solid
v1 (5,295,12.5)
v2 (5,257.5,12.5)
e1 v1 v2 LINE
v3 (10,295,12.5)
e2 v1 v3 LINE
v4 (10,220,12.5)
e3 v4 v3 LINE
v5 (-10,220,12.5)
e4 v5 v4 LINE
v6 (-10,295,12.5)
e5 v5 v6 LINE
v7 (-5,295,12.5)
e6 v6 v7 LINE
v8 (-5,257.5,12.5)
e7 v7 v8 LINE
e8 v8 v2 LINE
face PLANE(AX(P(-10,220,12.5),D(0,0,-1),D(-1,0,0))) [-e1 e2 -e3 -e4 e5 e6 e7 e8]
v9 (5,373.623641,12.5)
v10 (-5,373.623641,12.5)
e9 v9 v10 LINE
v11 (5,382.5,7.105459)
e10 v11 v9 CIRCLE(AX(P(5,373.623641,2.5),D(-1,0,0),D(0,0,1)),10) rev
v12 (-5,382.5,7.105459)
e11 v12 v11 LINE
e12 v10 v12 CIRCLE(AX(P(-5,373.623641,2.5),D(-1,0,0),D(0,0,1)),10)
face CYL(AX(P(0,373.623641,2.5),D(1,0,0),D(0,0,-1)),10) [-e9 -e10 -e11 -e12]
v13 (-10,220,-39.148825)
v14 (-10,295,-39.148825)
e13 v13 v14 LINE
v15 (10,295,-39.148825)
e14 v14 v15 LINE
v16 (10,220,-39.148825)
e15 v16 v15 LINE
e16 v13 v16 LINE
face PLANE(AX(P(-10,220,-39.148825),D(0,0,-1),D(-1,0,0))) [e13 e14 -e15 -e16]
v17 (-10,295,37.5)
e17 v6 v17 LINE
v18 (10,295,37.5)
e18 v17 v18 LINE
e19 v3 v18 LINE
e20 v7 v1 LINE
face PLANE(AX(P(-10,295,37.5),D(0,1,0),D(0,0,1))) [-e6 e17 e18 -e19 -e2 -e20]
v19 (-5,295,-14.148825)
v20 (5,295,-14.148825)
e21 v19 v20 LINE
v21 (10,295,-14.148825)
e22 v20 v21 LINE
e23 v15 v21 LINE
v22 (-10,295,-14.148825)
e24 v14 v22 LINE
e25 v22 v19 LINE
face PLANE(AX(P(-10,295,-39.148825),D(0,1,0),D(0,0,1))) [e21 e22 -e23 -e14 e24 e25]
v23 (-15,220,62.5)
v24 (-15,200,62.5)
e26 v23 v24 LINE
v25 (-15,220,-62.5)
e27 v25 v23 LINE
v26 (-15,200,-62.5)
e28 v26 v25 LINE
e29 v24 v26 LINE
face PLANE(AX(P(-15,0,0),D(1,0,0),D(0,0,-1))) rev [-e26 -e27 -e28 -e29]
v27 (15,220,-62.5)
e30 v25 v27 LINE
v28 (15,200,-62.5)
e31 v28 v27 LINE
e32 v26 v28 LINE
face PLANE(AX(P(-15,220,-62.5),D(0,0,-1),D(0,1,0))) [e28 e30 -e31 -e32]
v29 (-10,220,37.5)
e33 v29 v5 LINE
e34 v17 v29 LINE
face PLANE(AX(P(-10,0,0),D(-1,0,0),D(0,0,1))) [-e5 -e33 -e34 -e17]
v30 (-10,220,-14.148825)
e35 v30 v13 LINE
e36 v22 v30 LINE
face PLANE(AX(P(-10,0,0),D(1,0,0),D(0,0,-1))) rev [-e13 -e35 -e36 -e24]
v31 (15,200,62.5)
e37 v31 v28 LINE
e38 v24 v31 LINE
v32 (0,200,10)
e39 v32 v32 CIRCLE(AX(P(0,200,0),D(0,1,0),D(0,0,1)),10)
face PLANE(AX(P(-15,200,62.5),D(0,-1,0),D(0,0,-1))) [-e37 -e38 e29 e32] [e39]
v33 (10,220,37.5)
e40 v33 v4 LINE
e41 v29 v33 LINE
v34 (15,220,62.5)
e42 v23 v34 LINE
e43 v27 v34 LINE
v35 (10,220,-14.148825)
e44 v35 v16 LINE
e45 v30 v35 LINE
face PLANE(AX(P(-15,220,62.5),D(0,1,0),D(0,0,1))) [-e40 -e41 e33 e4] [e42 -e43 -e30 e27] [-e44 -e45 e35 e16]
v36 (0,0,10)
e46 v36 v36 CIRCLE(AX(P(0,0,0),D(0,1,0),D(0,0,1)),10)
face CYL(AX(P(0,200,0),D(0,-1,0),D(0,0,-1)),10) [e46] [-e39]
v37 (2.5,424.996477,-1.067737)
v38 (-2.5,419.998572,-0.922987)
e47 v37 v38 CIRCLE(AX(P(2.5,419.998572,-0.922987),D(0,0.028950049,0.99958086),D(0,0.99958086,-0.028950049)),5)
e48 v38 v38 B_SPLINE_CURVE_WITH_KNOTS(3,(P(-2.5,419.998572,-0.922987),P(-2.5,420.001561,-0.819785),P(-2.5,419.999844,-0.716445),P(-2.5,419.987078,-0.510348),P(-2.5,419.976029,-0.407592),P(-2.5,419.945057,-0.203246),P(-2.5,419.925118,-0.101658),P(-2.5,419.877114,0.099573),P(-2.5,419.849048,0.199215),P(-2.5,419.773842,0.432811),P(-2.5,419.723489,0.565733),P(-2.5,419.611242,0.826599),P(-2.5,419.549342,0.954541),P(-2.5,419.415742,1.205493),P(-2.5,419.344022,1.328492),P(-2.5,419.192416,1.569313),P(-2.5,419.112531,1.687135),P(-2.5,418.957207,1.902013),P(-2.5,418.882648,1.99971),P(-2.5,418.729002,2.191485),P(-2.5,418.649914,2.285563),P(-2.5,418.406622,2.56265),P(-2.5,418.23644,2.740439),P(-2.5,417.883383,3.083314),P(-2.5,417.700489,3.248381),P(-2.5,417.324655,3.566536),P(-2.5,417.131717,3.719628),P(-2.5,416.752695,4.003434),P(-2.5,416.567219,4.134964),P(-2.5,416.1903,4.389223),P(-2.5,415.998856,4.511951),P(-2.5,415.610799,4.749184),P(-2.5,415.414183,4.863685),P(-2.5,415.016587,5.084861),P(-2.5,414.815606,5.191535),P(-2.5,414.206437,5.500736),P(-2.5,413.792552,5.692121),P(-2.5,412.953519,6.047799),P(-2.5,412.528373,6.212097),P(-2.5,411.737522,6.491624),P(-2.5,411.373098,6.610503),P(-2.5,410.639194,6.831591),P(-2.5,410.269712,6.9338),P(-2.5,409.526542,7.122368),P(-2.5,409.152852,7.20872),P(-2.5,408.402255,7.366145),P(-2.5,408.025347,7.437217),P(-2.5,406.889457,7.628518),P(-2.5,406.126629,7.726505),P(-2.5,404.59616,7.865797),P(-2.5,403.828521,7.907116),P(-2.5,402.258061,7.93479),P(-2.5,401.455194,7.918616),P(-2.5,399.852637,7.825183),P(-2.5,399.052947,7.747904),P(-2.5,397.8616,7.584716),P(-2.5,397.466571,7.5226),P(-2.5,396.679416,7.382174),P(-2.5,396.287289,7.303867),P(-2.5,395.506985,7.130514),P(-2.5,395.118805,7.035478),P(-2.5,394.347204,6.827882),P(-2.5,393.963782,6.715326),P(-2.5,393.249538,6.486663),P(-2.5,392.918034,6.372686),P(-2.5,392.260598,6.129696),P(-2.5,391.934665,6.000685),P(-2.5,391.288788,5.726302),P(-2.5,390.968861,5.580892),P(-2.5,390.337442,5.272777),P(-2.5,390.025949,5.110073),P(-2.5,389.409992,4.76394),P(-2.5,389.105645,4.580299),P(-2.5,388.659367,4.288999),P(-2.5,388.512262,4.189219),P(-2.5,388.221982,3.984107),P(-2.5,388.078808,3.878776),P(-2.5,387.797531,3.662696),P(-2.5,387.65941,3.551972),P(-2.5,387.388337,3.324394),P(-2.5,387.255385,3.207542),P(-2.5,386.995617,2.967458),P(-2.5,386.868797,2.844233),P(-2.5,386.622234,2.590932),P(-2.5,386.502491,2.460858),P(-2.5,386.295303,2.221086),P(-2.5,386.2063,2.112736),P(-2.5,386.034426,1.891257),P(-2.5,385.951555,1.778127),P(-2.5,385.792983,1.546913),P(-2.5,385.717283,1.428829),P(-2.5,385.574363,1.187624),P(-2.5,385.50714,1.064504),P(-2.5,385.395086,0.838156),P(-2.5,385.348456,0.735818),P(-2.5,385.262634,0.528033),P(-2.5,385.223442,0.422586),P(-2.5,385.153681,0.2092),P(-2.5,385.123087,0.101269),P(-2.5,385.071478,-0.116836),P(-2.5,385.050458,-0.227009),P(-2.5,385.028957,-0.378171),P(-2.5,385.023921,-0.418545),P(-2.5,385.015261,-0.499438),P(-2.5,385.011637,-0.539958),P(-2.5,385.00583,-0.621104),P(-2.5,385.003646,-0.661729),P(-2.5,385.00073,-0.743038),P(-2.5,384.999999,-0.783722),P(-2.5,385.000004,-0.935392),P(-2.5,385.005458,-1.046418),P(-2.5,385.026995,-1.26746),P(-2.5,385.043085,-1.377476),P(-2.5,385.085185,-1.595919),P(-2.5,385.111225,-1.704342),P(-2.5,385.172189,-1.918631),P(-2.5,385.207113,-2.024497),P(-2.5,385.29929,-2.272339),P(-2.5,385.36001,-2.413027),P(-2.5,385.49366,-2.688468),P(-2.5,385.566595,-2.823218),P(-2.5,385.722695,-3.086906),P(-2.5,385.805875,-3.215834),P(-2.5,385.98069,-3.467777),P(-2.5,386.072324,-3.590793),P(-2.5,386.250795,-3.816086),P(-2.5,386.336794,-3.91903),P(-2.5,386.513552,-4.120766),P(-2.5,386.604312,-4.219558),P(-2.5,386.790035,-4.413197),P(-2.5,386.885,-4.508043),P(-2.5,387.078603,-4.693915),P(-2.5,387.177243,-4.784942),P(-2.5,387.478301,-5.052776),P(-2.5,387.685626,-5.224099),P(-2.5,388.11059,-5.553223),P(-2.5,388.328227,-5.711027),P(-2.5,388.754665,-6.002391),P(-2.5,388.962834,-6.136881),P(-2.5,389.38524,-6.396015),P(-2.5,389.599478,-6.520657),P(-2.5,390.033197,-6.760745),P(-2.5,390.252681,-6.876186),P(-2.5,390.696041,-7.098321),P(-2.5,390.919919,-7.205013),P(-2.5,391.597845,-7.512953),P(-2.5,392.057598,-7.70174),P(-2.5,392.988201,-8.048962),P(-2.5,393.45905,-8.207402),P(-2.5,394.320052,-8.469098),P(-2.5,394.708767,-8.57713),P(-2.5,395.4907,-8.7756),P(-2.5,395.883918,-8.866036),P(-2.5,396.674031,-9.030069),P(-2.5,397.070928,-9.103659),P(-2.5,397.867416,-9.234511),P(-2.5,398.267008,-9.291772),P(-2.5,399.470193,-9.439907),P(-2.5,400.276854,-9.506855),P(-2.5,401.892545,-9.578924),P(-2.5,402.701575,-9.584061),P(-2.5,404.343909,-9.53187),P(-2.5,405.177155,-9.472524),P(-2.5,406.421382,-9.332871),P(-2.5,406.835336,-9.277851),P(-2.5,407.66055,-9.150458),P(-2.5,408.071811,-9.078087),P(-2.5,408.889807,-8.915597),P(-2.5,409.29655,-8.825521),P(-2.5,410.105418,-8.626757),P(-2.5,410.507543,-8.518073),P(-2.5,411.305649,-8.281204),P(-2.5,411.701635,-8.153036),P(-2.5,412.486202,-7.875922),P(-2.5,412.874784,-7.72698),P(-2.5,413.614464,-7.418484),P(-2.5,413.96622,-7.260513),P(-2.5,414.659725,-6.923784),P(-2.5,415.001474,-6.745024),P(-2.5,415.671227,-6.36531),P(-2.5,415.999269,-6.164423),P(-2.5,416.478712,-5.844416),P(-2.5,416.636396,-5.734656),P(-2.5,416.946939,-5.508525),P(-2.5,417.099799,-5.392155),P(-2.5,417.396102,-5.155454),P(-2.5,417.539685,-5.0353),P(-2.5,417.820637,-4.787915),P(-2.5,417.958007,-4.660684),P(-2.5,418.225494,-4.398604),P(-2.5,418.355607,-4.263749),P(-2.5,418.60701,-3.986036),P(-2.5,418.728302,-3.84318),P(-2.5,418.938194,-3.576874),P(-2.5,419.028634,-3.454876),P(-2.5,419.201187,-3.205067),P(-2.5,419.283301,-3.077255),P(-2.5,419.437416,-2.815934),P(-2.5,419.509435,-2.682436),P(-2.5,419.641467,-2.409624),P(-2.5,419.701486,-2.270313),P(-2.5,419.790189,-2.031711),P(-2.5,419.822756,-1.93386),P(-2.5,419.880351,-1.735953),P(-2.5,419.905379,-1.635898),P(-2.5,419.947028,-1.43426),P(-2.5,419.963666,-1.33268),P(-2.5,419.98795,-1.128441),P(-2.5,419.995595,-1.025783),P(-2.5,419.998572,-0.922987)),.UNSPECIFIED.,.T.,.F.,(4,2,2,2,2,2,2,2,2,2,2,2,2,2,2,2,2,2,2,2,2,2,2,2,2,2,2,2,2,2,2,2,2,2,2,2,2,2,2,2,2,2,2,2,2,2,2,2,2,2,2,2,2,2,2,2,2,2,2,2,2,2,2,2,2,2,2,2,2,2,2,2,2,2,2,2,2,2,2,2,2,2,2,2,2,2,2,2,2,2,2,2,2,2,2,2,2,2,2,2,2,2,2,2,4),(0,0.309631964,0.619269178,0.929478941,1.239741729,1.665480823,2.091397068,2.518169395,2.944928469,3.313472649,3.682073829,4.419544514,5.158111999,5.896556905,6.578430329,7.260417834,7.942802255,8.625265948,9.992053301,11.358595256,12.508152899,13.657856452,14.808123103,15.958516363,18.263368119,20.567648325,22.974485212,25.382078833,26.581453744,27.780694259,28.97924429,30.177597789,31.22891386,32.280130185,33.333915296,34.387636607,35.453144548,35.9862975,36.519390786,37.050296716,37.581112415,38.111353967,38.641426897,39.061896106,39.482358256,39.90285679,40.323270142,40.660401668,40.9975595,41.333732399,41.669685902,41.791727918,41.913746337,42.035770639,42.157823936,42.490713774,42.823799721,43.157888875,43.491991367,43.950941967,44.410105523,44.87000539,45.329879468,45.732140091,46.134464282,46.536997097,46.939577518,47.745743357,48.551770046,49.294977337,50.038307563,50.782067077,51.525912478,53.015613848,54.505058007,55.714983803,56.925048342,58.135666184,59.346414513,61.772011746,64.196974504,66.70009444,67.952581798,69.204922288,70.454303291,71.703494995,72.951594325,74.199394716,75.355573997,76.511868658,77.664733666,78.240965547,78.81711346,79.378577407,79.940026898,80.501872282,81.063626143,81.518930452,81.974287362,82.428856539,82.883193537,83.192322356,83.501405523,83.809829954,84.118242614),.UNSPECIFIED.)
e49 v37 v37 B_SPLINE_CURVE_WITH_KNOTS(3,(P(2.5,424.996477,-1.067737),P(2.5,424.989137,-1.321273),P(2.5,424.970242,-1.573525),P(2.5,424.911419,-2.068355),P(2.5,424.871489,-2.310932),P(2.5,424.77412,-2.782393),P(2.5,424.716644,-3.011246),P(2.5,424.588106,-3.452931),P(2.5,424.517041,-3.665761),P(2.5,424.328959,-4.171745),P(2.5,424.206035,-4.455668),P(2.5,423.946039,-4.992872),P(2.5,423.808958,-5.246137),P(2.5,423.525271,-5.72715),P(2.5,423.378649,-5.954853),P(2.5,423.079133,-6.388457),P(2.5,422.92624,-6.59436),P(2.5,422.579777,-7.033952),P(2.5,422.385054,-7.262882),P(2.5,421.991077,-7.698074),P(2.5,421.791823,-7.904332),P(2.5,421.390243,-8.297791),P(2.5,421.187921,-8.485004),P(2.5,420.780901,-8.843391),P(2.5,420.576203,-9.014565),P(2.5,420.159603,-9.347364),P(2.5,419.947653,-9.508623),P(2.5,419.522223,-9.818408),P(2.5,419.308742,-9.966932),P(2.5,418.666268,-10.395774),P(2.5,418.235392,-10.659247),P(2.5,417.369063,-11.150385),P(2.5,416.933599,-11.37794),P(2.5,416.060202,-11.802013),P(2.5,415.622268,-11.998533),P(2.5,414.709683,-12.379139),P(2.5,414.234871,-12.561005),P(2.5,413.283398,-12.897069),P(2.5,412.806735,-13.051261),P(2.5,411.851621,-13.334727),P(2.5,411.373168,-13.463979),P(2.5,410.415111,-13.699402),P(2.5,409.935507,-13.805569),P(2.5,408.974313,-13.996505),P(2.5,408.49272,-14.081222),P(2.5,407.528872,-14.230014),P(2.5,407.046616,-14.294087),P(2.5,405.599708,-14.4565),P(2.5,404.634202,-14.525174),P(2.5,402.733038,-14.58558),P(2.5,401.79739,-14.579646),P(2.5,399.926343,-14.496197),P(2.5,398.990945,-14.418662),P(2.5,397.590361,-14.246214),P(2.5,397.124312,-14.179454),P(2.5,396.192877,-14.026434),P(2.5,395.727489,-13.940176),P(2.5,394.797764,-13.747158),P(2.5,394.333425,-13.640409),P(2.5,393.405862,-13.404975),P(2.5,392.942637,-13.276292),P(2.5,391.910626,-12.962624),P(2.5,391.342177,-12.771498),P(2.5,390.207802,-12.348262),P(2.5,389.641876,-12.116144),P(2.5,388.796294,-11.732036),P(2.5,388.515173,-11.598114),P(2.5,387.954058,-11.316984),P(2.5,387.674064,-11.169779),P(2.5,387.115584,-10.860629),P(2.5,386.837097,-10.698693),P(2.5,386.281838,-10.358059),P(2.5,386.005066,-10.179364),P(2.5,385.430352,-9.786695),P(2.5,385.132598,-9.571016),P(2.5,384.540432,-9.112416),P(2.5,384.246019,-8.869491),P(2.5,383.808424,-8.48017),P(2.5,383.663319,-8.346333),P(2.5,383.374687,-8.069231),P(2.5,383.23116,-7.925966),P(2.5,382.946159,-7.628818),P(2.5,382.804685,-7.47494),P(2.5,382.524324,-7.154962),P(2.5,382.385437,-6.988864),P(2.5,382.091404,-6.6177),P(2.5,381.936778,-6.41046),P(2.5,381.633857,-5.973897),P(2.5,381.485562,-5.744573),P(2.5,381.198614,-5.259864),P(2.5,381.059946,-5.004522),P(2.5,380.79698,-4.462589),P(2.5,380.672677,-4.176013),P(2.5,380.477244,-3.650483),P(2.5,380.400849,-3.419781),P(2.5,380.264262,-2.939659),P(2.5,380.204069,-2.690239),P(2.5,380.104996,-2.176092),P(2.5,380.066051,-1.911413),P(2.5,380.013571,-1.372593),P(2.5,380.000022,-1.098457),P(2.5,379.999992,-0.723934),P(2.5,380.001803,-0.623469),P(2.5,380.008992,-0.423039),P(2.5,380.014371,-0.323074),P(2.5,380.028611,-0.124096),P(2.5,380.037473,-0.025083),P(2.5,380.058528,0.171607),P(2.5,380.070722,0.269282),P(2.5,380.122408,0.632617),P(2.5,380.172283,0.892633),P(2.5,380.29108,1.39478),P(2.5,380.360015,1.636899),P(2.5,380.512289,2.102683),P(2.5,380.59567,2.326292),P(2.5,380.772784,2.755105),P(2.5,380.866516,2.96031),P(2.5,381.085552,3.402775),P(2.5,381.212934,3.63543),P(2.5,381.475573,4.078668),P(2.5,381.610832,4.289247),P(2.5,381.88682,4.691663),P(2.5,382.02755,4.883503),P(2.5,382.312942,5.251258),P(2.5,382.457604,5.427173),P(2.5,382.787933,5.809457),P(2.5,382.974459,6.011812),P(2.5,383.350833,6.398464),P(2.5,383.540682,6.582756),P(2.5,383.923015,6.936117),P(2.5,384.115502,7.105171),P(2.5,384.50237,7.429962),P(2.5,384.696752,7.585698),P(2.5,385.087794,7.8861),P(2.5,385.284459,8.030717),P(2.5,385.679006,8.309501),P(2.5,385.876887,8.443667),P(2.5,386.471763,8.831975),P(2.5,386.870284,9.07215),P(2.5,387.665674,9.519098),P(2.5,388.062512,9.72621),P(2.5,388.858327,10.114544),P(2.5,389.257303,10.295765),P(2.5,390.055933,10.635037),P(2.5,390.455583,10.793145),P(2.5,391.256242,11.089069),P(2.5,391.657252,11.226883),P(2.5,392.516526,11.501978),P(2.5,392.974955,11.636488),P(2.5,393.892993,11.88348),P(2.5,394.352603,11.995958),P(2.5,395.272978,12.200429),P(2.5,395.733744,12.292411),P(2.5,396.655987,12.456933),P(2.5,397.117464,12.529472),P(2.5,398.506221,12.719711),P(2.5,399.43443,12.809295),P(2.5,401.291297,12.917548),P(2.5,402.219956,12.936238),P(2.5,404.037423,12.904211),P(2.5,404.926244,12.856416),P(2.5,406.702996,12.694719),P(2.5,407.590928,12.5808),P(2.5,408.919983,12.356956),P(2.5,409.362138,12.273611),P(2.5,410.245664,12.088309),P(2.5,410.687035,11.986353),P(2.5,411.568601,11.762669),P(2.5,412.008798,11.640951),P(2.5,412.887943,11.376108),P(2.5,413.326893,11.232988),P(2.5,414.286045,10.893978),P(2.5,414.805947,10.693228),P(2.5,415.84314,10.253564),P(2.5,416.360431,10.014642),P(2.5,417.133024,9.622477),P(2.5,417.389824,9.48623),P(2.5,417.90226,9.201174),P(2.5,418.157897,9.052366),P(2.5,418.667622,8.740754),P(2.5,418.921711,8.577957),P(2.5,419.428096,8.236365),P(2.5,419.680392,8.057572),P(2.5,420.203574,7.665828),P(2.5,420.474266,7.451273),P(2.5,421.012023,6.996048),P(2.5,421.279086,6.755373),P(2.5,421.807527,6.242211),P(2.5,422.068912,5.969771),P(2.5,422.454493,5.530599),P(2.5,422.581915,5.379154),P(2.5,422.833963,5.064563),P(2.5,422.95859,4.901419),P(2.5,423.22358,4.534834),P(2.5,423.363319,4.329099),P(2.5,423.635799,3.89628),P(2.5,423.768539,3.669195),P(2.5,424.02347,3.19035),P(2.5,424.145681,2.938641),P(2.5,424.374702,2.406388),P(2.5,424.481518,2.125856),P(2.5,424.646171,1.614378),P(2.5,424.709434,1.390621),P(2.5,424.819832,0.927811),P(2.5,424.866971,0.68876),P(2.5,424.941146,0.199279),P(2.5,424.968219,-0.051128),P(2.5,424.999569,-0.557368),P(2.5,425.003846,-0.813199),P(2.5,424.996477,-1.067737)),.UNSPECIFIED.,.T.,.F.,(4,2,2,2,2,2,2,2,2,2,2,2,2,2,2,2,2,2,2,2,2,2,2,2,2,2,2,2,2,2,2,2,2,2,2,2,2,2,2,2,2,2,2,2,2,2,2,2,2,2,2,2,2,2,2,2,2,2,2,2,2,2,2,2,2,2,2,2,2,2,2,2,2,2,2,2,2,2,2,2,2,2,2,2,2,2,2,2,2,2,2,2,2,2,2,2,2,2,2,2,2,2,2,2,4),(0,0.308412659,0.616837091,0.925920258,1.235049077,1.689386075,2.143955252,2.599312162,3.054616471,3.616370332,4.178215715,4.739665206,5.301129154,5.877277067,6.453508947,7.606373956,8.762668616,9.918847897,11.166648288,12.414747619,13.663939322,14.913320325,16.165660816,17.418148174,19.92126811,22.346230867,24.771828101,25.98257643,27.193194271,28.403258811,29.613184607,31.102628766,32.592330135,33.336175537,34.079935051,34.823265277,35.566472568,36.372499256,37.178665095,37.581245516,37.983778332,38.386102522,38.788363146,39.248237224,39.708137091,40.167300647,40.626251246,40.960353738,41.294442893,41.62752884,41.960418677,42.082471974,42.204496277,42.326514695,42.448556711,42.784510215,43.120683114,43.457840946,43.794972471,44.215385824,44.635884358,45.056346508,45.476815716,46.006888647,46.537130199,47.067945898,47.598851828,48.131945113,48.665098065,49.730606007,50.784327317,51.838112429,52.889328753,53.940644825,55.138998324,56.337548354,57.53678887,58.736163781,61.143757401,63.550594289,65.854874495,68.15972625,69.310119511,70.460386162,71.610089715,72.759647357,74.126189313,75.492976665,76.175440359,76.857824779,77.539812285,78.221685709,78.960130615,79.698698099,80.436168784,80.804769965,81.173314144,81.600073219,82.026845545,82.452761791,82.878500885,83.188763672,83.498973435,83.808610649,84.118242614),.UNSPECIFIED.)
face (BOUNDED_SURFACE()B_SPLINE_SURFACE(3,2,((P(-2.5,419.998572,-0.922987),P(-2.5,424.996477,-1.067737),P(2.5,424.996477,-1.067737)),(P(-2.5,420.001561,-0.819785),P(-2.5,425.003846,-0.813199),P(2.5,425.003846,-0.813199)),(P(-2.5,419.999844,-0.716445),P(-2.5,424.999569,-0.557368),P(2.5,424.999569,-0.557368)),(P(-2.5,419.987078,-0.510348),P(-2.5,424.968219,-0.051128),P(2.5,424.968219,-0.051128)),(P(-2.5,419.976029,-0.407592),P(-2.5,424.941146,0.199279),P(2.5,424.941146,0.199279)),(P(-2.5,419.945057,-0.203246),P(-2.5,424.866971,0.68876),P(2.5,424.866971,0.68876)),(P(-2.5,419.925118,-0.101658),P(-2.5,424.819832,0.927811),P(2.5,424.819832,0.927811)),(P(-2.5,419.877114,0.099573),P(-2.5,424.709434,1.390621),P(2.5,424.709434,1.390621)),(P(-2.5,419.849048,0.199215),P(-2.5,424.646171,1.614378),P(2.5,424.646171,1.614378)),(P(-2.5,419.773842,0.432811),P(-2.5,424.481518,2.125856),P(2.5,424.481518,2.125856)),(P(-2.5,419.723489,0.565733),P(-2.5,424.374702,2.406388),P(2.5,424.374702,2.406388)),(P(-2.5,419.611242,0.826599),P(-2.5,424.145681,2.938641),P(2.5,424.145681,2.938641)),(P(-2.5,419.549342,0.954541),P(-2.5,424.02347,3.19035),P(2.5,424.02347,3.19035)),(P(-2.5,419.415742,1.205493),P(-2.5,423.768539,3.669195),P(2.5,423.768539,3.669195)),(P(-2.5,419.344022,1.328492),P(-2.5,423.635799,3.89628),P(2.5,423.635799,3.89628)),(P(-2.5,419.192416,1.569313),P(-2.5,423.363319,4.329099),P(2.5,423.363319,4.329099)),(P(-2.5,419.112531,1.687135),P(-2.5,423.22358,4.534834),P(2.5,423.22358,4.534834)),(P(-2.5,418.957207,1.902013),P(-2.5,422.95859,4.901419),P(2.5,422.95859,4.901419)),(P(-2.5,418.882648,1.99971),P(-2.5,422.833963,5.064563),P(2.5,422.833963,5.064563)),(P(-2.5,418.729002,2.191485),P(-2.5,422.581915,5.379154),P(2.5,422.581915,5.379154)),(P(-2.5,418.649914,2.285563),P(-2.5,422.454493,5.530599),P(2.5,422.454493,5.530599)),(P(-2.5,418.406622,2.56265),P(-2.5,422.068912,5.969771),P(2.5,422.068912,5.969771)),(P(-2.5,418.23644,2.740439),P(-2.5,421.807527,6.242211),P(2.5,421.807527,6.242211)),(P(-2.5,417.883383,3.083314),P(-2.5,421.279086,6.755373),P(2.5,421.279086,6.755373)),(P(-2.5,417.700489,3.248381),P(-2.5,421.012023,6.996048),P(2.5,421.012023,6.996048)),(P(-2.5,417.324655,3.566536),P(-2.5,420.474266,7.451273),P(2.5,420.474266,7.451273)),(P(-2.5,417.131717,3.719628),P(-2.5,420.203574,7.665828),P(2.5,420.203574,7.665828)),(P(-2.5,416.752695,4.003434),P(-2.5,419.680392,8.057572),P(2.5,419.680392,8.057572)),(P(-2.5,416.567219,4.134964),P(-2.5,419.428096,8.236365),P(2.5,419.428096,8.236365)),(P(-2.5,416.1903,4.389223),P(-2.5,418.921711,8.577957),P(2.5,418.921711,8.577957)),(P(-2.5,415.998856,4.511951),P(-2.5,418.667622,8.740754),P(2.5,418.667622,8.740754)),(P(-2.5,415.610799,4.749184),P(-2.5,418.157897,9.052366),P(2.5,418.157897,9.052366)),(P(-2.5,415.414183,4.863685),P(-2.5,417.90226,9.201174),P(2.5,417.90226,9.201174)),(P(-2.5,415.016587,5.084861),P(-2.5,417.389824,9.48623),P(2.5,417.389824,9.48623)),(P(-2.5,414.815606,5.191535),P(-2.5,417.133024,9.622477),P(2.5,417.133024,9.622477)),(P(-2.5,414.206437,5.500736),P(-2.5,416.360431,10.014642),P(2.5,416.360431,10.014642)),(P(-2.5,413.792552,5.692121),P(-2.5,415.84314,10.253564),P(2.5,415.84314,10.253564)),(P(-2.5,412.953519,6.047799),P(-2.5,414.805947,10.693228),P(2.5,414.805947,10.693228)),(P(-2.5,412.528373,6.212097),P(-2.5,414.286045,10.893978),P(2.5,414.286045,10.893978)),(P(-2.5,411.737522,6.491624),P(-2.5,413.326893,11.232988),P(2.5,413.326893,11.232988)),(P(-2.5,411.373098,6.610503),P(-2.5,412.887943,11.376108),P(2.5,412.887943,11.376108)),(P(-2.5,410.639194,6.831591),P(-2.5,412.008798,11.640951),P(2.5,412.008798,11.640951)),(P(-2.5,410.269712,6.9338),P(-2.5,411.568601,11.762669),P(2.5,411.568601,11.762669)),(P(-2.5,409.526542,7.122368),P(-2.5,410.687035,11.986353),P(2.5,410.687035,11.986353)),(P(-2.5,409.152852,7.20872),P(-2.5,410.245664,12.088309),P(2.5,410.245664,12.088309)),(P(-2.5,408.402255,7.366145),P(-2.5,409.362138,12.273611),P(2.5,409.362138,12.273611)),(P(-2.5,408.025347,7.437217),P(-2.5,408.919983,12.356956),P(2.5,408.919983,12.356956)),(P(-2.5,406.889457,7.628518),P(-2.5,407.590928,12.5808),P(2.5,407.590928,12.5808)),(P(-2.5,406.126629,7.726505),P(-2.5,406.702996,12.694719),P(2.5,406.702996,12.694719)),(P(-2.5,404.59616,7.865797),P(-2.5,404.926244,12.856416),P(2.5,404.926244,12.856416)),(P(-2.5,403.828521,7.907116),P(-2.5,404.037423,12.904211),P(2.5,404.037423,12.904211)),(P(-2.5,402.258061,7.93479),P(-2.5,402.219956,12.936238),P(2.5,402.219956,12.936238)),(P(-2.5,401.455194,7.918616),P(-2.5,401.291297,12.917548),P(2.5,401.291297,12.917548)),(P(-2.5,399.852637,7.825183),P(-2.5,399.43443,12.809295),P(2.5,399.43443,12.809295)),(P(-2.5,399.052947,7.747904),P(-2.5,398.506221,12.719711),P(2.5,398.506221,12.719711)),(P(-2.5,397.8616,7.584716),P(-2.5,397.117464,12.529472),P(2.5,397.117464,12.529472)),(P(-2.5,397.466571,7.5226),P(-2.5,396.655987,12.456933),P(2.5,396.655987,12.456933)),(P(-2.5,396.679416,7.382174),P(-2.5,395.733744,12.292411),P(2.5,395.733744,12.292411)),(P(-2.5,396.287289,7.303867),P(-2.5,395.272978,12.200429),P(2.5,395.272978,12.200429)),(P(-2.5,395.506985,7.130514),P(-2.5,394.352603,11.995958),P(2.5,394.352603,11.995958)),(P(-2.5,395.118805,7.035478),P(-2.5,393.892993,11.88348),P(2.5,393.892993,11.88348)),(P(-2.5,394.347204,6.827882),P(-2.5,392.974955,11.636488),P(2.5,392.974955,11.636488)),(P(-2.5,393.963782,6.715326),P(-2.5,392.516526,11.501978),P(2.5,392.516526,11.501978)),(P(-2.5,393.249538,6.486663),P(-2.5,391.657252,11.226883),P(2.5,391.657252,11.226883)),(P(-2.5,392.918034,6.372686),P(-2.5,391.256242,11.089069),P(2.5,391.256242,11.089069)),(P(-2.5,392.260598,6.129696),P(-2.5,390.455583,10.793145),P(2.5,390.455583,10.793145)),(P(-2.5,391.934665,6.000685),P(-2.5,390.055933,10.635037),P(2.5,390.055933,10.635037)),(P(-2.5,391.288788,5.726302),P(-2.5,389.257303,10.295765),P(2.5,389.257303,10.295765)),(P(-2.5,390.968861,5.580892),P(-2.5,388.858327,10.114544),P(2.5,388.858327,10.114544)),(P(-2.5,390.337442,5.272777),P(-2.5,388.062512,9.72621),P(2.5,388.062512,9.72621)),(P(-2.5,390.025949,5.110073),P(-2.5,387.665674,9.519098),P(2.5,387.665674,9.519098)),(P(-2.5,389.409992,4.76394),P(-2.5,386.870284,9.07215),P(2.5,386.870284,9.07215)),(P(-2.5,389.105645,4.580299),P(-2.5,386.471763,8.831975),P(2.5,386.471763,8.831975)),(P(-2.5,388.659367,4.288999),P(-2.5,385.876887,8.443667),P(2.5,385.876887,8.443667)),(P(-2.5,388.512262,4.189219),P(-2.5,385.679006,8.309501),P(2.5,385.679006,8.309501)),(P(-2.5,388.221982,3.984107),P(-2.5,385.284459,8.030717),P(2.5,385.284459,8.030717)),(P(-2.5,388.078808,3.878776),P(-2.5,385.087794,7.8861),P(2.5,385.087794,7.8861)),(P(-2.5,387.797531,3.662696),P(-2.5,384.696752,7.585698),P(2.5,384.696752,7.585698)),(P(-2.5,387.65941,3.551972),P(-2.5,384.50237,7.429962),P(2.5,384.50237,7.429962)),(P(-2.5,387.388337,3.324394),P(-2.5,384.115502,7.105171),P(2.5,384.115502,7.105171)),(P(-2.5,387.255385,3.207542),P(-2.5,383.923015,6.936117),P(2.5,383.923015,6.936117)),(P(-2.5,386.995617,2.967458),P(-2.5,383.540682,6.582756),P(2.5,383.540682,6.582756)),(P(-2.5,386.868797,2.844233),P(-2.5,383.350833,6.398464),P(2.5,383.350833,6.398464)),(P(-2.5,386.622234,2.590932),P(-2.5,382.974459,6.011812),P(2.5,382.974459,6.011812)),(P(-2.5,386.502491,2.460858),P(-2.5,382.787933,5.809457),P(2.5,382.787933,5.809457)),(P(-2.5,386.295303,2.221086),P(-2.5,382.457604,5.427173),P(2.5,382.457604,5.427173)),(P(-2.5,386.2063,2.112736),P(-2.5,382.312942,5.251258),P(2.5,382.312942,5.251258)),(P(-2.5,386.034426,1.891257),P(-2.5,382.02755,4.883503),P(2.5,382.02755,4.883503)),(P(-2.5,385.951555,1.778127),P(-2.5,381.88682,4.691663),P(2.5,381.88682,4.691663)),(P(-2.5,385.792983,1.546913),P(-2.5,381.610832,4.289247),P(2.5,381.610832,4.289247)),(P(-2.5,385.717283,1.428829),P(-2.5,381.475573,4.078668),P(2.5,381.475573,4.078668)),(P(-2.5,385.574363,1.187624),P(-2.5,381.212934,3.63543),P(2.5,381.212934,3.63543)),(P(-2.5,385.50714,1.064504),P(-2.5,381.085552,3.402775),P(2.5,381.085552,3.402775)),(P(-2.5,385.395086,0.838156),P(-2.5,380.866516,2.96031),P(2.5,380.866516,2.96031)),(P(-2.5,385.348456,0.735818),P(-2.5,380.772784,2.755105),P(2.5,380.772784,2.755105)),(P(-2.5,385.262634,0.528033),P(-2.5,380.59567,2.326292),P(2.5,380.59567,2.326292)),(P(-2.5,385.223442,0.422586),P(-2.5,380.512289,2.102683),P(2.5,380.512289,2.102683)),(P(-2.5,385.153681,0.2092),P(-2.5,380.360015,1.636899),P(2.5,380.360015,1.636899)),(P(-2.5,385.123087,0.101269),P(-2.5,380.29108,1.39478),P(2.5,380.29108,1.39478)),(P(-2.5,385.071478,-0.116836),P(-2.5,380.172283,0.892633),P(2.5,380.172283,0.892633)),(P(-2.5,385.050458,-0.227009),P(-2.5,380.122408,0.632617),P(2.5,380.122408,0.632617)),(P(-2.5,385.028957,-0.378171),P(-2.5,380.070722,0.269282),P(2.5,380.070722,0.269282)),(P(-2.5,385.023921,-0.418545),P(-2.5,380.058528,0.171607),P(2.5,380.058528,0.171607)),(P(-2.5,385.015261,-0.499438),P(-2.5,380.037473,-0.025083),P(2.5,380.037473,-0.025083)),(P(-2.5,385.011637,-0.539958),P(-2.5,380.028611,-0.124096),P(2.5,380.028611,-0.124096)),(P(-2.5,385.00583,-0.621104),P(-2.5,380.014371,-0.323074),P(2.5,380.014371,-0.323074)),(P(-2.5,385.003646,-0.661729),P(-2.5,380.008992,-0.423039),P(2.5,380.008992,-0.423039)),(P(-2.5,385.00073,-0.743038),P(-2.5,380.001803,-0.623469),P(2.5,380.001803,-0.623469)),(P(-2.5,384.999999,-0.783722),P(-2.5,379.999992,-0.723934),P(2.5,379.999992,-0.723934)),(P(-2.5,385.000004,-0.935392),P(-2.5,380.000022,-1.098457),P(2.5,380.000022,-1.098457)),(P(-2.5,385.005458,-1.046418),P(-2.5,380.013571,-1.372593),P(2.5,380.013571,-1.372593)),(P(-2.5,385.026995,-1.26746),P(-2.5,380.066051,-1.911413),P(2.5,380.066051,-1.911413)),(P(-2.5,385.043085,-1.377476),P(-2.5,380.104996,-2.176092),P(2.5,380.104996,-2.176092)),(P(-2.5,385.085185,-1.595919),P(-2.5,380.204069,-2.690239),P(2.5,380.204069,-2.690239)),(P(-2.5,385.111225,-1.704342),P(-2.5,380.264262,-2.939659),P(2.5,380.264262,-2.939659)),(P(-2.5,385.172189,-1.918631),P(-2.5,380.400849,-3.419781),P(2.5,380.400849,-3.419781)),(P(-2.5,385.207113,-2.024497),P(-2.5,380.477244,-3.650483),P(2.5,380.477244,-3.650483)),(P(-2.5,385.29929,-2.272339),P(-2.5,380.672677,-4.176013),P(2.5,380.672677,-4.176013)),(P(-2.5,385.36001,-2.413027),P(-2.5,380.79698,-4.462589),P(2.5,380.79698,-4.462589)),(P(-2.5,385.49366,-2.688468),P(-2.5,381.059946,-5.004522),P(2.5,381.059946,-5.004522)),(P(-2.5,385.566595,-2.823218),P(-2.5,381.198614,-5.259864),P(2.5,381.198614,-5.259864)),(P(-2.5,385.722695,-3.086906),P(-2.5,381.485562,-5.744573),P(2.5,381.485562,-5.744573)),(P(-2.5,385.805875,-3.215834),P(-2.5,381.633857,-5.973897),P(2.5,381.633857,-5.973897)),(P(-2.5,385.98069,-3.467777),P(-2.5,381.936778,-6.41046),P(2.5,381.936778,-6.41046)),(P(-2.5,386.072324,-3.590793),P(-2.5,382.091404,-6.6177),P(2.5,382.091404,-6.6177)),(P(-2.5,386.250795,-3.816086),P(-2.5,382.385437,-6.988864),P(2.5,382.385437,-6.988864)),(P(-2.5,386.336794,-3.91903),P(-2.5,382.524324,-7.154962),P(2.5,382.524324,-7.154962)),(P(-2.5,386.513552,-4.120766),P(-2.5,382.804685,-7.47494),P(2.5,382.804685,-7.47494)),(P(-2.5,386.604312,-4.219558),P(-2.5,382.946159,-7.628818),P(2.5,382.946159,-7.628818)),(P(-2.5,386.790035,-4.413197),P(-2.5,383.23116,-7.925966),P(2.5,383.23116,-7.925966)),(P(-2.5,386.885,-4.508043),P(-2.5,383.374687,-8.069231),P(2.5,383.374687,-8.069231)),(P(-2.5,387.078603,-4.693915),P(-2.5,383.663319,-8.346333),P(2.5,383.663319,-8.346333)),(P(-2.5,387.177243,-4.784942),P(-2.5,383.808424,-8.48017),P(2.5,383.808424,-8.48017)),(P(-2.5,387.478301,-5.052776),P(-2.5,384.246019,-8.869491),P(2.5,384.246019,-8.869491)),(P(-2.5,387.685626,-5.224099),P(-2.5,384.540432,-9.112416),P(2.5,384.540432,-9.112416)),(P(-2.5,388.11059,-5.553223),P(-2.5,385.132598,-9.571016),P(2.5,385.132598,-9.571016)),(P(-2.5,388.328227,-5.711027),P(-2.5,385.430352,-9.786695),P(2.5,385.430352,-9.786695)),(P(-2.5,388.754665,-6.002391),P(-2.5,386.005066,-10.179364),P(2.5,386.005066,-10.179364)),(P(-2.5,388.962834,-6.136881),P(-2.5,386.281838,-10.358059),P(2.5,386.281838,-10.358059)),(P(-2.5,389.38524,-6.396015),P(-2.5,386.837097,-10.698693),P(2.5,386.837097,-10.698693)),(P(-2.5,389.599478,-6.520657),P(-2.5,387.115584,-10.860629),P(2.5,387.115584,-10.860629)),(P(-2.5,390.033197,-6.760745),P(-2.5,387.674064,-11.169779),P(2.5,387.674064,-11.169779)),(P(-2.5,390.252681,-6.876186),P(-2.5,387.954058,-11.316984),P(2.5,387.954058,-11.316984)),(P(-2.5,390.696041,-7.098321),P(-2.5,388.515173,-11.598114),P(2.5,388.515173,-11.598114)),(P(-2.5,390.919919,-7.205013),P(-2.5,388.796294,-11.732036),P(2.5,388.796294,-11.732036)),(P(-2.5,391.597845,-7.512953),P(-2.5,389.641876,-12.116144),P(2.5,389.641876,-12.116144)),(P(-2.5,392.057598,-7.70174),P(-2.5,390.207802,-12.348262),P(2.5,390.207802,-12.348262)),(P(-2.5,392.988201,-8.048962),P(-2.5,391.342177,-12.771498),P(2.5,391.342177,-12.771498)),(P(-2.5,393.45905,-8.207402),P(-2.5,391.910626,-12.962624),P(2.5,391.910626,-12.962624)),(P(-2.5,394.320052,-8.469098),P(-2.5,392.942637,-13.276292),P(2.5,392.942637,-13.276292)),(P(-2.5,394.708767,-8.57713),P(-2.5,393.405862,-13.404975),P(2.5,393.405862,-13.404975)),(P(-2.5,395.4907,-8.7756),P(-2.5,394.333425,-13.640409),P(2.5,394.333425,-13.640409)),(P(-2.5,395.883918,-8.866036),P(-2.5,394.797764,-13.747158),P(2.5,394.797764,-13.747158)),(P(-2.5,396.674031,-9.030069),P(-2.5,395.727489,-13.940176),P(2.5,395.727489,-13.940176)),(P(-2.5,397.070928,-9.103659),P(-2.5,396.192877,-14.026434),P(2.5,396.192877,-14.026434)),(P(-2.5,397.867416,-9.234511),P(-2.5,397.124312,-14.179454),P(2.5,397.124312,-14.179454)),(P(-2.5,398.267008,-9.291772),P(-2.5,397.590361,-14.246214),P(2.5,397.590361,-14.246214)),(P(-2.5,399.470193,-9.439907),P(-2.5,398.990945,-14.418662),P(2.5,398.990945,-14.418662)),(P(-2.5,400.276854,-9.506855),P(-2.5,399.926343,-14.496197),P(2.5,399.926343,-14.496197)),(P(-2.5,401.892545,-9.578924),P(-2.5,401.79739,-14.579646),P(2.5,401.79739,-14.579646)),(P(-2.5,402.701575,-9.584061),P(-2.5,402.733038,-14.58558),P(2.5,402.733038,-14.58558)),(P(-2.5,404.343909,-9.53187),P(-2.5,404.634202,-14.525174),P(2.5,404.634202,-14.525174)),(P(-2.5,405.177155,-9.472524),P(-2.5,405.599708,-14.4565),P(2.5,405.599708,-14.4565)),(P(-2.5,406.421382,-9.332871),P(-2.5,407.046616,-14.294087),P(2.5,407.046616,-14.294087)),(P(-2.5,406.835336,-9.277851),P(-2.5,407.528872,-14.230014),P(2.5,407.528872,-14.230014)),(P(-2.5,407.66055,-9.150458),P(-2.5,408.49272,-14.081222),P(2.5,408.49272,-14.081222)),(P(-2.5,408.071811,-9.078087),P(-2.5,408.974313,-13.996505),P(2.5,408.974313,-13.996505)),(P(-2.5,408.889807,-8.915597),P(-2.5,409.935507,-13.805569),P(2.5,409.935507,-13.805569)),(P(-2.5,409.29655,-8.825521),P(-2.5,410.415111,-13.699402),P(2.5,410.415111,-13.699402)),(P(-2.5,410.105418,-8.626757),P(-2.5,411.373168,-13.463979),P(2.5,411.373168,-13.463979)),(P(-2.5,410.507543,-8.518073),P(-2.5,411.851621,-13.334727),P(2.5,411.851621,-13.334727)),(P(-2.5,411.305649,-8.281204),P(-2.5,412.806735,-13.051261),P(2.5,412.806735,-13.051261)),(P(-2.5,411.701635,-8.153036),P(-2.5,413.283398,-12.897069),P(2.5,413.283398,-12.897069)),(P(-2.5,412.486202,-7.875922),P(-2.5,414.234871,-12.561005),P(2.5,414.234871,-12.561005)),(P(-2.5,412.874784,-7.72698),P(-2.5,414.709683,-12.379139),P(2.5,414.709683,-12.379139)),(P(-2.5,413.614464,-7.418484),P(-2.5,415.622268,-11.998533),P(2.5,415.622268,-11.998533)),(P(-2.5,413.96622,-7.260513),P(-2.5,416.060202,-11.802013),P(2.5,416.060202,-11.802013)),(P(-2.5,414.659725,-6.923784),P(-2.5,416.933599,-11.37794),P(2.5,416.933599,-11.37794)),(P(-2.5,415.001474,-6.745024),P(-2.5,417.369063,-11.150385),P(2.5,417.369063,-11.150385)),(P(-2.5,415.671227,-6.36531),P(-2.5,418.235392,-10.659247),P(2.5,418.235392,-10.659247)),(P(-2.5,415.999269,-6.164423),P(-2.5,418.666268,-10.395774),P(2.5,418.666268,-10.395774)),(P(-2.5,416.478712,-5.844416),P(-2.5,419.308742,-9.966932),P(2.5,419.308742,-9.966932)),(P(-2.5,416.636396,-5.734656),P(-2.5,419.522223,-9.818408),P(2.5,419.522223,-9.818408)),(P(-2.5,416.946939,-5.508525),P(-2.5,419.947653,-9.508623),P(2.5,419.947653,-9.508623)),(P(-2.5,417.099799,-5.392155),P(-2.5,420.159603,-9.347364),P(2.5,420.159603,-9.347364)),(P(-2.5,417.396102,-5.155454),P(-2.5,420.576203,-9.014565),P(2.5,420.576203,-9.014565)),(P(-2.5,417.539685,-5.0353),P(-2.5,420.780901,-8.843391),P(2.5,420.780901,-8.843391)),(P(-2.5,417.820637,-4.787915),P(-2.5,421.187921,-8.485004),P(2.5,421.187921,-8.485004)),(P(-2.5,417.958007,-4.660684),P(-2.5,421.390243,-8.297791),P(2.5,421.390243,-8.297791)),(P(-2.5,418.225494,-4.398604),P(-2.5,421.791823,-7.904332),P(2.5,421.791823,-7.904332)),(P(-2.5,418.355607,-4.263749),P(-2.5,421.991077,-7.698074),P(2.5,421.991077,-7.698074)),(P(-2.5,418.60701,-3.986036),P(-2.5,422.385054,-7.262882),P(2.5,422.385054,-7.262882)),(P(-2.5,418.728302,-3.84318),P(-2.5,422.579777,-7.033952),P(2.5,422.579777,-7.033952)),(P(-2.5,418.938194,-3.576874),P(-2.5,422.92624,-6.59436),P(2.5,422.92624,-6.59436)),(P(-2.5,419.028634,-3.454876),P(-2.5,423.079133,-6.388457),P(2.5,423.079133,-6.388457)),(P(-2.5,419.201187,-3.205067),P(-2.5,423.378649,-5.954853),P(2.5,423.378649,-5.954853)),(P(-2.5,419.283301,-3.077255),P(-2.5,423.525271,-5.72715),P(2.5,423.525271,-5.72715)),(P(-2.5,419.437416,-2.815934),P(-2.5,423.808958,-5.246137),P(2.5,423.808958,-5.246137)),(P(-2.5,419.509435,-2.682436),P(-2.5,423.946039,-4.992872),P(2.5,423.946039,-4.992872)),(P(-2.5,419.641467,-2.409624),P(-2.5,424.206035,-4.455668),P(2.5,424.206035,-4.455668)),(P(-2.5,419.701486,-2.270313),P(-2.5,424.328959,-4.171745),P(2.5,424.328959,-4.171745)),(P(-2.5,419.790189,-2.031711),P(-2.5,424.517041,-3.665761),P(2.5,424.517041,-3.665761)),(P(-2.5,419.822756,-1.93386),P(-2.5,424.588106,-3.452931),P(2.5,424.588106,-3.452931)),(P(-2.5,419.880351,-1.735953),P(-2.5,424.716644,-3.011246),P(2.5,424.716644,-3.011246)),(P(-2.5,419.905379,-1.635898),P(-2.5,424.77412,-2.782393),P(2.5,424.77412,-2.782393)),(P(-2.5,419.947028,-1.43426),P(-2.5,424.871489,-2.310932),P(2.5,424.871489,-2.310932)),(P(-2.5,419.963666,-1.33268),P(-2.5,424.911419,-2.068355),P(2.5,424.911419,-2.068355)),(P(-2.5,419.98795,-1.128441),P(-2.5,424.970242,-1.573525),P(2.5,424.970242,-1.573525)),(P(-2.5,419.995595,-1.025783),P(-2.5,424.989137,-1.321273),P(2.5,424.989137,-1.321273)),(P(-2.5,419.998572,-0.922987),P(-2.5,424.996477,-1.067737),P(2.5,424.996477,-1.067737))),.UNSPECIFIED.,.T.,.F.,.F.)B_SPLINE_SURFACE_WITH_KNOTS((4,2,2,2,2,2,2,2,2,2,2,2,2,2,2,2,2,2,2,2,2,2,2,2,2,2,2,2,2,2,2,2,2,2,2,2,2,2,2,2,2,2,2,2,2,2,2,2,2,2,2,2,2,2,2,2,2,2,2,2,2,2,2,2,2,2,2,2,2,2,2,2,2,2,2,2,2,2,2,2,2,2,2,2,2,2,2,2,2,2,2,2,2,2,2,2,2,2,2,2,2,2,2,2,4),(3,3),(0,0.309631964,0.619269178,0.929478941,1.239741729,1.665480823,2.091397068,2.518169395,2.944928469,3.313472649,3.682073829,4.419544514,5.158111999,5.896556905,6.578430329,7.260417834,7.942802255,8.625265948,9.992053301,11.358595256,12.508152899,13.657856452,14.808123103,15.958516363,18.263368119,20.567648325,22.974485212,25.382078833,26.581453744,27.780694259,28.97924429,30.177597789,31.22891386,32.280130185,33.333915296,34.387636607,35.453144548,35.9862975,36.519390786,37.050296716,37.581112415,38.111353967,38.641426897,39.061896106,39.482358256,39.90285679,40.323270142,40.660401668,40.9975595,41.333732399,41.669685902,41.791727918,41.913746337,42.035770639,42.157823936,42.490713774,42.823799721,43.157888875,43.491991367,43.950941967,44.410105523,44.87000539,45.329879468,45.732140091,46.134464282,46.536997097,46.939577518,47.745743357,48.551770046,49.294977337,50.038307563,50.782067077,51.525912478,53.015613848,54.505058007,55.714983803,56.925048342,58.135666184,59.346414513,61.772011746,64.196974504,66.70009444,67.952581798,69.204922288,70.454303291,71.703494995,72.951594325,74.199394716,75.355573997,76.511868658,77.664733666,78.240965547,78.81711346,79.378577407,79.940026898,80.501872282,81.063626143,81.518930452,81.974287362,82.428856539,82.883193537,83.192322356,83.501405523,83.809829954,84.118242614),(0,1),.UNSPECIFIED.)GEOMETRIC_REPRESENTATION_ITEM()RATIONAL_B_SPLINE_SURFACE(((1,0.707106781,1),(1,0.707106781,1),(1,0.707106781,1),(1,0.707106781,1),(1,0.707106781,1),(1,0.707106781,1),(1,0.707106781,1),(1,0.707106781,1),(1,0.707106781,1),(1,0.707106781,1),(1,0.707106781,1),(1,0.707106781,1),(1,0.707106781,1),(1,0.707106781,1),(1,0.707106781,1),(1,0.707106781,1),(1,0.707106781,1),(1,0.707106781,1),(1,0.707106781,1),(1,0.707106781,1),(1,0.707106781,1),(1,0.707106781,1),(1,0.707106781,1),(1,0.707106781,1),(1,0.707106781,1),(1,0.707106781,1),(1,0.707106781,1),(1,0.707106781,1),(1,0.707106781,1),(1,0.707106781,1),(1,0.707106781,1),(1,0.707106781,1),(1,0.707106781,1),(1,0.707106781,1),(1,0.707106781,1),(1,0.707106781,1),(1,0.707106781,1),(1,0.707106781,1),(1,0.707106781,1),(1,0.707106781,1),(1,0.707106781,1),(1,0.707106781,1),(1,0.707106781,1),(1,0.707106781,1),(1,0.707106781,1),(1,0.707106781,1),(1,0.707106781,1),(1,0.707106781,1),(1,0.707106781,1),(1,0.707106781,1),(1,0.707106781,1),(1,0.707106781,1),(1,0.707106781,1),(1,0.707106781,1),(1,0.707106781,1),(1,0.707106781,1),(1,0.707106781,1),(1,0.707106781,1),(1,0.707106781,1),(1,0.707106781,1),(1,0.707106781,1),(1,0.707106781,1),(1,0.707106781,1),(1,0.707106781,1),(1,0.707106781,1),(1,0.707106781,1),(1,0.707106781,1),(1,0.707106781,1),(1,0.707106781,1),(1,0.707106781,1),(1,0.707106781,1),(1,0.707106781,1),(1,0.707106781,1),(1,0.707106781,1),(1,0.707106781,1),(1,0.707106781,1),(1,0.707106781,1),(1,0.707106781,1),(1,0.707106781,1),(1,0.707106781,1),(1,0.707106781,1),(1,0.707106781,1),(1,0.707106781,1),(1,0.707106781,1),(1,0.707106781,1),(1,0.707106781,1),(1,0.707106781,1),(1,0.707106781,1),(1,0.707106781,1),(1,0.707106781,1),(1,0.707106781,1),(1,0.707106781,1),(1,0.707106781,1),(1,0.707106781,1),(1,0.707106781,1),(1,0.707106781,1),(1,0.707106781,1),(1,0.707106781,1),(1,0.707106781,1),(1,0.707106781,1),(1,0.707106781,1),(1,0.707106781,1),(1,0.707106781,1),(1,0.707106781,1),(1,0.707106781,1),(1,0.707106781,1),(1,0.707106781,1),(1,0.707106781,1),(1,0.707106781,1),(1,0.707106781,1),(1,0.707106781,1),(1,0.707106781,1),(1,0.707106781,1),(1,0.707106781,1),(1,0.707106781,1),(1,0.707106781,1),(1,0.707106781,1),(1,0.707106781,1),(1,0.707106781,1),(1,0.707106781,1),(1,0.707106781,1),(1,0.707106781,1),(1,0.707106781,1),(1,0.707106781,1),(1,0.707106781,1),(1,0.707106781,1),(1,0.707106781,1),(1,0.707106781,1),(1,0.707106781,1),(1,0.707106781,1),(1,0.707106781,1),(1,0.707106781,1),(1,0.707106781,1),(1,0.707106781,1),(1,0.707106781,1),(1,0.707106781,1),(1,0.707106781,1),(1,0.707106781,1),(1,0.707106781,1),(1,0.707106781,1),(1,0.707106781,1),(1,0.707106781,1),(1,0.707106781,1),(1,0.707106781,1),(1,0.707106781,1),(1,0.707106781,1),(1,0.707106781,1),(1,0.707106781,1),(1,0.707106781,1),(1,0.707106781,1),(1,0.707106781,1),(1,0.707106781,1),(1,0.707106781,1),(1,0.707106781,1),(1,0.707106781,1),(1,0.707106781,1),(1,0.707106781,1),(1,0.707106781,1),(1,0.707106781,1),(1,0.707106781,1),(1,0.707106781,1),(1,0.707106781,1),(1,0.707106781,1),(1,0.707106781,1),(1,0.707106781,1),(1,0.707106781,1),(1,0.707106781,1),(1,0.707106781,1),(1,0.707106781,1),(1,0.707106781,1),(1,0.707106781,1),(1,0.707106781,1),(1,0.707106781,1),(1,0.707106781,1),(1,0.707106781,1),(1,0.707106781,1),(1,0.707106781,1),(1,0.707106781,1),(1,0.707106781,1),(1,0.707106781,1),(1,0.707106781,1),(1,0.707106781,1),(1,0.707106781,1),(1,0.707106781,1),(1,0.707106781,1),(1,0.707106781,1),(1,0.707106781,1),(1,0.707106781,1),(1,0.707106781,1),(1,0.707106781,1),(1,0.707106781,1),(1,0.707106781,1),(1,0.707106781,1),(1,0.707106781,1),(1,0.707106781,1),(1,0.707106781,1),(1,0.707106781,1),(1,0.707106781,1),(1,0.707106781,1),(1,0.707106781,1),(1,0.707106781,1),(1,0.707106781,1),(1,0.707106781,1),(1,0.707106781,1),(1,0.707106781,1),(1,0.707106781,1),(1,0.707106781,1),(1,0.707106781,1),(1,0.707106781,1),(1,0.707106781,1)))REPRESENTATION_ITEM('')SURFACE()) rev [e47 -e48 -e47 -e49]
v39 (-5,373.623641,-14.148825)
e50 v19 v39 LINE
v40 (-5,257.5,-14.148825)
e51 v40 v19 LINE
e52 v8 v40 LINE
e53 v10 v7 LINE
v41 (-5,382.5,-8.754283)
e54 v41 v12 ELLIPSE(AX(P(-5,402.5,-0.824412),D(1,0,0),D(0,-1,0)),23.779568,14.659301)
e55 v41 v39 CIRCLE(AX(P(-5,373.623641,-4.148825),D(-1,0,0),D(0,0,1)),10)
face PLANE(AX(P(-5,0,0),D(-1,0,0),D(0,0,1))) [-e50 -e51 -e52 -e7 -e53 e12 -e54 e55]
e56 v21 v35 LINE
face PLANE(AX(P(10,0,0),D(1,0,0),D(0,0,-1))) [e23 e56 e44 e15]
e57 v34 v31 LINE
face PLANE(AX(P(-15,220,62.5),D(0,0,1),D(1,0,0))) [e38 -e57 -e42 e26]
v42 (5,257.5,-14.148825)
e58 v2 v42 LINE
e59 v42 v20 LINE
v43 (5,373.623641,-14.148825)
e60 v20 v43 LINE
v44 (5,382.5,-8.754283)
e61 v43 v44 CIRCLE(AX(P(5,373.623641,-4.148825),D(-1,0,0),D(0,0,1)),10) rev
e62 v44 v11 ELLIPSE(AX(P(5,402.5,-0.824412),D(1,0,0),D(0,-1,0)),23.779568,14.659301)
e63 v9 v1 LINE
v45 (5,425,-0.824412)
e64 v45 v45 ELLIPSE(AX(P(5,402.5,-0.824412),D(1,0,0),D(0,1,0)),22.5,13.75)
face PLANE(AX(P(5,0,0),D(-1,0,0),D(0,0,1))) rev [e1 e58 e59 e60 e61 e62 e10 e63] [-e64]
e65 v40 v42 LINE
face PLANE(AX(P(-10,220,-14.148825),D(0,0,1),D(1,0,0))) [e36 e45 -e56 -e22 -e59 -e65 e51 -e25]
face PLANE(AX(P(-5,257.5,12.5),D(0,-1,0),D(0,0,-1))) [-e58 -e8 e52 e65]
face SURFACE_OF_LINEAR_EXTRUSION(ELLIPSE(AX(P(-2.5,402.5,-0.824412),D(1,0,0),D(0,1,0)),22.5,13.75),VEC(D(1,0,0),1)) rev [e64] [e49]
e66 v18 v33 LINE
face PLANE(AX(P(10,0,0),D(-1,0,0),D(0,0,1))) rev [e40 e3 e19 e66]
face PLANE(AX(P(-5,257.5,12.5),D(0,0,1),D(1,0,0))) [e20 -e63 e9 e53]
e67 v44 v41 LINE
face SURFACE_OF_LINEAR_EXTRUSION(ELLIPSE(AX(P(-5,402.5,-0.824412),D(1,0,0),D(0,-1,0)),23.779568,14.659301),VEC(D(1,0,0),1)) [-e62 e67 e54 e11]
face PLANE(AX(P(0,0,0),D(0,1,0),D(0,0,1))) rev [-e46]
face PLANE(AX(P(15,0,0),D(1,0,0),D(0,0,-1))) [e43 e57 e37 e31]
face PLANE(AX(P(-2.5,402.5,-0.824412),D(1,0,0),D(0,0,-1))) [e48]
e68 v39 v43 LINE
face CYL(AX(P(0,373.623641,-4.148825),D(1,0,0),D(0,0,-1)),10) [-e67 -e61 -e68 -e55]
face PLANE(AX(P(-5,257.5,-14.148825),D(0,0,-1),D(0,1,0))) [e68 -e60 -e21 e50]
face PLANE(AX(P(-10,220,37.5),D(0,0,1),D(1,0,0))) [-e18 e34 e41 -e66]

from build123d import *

# Parameters (mm, degrees)
SKETCH1_R                = 10
BOSS_EXTRUDE1_DEPTH      = 200
BOSS_EXTRUDE2_DEPTH      = 15
BOSS_EXTRUDE2_DEPTH_BACK = 15
SKETCH2_W                = 125
SKETCH2_H                = 20
BOSS_EXTRUDE3_DEPTH      = 10
BOSS_EXTRUDE3_DEPTH_BACK = 10
SKETCH3_W                = 25
SKETCH3_H                = 75
BOSS_EXTRUDE4_DEPTH      = 5
BOSS_EXTRUDE4_DEPTH_BACK = 5
SKETCH5_W                = 26.648824617
SKETCH5_H                = 125
BOSS_EXTRUDE5_DEPTH      = 5
BOSS_EXTRUDE5_DEPTH_BACK = 5
SKETCH6_RX               = 23.77956847
SKETCH6_RY               = 14.659300575
FILLET1_R                = 10
FILLET2_R                = 10
SKETCH7_RX               = 22.5
SKETCH7_RY               = 13.75
CUT_EXTRUDE1_DEPTH       = 7.5
FILLET3_R                = 5


with BuildPart() as part:
    # Sketch1 → Boss-Extrude1 (new body)
    with BuildSketch(Plane(origin=(0, 0, 0), x_dir=(1, 0, 0), z_dir=(0, 1, 0))):
        with Locations(Location((0, 0, 0), (0, 0, 270))):
            Circle(SKETCH1_R)
    extrude(amount=BOSS_EXTRUDE1_DEPTH)

    # Sketch2 → Boss-Extrude2 (add, two sides: drawn at the far end of the back side and taken through both)
    with BuildSketch(Plane(origin=(0, 0, 0), x_dir=(0, 0, -1), z_dir=(1, 0, 0)).offset(-BOSS_EXTRUDE2_DEPTH_BACK)):
        with Locations((0, 210)):
            Rectangle(SKETCH2_W, SKETCH2_H)
    extrude(amount=BOSS_EXTRUDE2_DEPTH + BOSS_EXTRUDE2_DEPTH_BACK)

    # Sketch3 → Boss-Extrude3 (add, two sides: drawn at the far end of the back side and taken through both)
    with BuildSketch(Plane(origin=(0, 0, 0), x_dir=(0, 0, -1), z_dir=(1, 0, 0)).offset(-BOSS_EXTRUDE3_DEPTH_BACK)):
        with Locations((-25, 257.5)):
            Rectangle(SKETCH3_W, SKETCH3_H)
        with Locations((26.648824617, 257.5)):
            Rectangle(SKETCH3_W, SKETCH3_H)
    extrude(amount=BOSS_EXTRUDE3_DEPTH + BOSS_EXTRUDE3_DEPTH_BACK)

    # Sketch5 → Boss-Extrude4 (add, two sides: drawn at the far end of the back side and taken through both)
    with BuildSketch(Plane(origin=(0, 0, 0), x_dir=(0, 0, -1), z_dir=(1, 0, 0)).offset(-BOSS_EXTRUDE4_DEPTH_BACK)):
        with Locations((0.824412309, 320)):
            Rectangle(SKETCH5_W, SKETCH5_H)
    extrude(amount=BOSS_EXTRUDE4_DEPTH + BOSS_EXTRUDE4_DEPTH_BACK)

    # Sketch6 → Boss-Extrude5 (add, two sides: drawn at the far end of the back side and taken through both)
    with BuildSketch(Plane(origin=(0, 0, 0), x_dir=(0, 0, -1), z_dir=(1, 0, 0)).offset(-BOSS_EXTRUDE5_DEPTH_BACK)):
        with Locations(Location((0.824412308, 402.5), (0, 0, -90))):
            Ellipse(SKETCH6_RX, SKETCH6_RY)
    extrude(amount=BOSS_EXTRUDE5_DEPTH + BOSS_EXTRUDE5_DEPTH_BACK)

    # Fillet1
    # the kernel refuses this fillet: 10 mm, written as the material it takes off along each edge
    with BuildSketch(Plane(origin=(-27.190897542, 382.5, -14.148824617), x_dir=(0, 0, 1), z_dir=(1, 0, 0))) as fillet1_piece_1:
        with BuildLine():
            CenterArc((10, 8.876359017), FILLET1_R, 180, 62.577662354)
            Line((0, 8.876359017), (0, 0))
            Line((0, 0), (5.394541216, 0))
        make_face()
    extrude(amount=27.190898125, mode=Mode.SUBTRACT)
    with BuildSketch(Plane(origin=(5.84e-07, 382.5, -14.148824617), x_dir=(0, 0, 1), z_dir=(1, 0, 0))) as fillet1_piece_2:
        with BuildLine():
            CenterArc((10, 8.876359017), FILLET1_R, 180, 62.577662354)
            Line((0, 8.876359017), (0, 0))
            Line((0, 0), (5.394541216, 0))
        make_face()
    extrude(amount=27.190896958, mode=Mode.SUBTRACT)

    # Fillet2
    # the kernel refuses this fillet: 10 mm, written as the material it takes off along each edge
    with BuildSketch(Plane(origin=(27.190897542, 382.5, 12.5), x_dir=(0, 0, -1), z_dir=(-1, 0, 0))) as fillet2_piece_1:
        with BuildLine():
            CenterArc((10, 8.876359017), FILLET2_R, 180, 62.577662355)
            Line((0, 8.876359017), (0, 0))
            Line((0, 0), (5.394541216, 0))
        make_face()
    extrude(amount=27.190896946, mode=Mode.SUBTRACT)
    with BuildSketch(Plane(origin=(5.96e-07, 382.5, 12.5), x_dir=(0, 0, -1), z_dir=(-1, 0, 0))) as fillet2_piece_2:
        with BuildLine():
            CenterArc((10, 8.876359017), FILLET2_R, 180, 62.577662354)
            Line((0, 8.876359017), (0, 0))
            Line((0, 0), (5.394541216, 0))
        make_face()
    extrude(amount=27.190898138, mode=Mode.SUBTRACT)

    # Sketch7 → Cut-Extrude1 (cut)
    with BuildSketch(Plane(origin=(5, 0, 0), x_dir=(0, 0, -1), z_dir=(1, 0, 0))):
        with Locations(Location((0.824412308, 402.5), (0, 0, 90))):
            Ellipse(SKETCH7_RX, SKETCH7_RY)
    extrude(amount=-CUT_EXTRUDE1_DEPTH, mode=Mode.SUBTRACT)

    # Fillet3
    fillet3_edges = [part.edges().sort_by_distance(p)[0] for p in [
        (-2.5, 380.000046084, -0.852241692),
    ]]
    fillet(fillet3_edges, radius=FILLET3_R)


solid = part.part
